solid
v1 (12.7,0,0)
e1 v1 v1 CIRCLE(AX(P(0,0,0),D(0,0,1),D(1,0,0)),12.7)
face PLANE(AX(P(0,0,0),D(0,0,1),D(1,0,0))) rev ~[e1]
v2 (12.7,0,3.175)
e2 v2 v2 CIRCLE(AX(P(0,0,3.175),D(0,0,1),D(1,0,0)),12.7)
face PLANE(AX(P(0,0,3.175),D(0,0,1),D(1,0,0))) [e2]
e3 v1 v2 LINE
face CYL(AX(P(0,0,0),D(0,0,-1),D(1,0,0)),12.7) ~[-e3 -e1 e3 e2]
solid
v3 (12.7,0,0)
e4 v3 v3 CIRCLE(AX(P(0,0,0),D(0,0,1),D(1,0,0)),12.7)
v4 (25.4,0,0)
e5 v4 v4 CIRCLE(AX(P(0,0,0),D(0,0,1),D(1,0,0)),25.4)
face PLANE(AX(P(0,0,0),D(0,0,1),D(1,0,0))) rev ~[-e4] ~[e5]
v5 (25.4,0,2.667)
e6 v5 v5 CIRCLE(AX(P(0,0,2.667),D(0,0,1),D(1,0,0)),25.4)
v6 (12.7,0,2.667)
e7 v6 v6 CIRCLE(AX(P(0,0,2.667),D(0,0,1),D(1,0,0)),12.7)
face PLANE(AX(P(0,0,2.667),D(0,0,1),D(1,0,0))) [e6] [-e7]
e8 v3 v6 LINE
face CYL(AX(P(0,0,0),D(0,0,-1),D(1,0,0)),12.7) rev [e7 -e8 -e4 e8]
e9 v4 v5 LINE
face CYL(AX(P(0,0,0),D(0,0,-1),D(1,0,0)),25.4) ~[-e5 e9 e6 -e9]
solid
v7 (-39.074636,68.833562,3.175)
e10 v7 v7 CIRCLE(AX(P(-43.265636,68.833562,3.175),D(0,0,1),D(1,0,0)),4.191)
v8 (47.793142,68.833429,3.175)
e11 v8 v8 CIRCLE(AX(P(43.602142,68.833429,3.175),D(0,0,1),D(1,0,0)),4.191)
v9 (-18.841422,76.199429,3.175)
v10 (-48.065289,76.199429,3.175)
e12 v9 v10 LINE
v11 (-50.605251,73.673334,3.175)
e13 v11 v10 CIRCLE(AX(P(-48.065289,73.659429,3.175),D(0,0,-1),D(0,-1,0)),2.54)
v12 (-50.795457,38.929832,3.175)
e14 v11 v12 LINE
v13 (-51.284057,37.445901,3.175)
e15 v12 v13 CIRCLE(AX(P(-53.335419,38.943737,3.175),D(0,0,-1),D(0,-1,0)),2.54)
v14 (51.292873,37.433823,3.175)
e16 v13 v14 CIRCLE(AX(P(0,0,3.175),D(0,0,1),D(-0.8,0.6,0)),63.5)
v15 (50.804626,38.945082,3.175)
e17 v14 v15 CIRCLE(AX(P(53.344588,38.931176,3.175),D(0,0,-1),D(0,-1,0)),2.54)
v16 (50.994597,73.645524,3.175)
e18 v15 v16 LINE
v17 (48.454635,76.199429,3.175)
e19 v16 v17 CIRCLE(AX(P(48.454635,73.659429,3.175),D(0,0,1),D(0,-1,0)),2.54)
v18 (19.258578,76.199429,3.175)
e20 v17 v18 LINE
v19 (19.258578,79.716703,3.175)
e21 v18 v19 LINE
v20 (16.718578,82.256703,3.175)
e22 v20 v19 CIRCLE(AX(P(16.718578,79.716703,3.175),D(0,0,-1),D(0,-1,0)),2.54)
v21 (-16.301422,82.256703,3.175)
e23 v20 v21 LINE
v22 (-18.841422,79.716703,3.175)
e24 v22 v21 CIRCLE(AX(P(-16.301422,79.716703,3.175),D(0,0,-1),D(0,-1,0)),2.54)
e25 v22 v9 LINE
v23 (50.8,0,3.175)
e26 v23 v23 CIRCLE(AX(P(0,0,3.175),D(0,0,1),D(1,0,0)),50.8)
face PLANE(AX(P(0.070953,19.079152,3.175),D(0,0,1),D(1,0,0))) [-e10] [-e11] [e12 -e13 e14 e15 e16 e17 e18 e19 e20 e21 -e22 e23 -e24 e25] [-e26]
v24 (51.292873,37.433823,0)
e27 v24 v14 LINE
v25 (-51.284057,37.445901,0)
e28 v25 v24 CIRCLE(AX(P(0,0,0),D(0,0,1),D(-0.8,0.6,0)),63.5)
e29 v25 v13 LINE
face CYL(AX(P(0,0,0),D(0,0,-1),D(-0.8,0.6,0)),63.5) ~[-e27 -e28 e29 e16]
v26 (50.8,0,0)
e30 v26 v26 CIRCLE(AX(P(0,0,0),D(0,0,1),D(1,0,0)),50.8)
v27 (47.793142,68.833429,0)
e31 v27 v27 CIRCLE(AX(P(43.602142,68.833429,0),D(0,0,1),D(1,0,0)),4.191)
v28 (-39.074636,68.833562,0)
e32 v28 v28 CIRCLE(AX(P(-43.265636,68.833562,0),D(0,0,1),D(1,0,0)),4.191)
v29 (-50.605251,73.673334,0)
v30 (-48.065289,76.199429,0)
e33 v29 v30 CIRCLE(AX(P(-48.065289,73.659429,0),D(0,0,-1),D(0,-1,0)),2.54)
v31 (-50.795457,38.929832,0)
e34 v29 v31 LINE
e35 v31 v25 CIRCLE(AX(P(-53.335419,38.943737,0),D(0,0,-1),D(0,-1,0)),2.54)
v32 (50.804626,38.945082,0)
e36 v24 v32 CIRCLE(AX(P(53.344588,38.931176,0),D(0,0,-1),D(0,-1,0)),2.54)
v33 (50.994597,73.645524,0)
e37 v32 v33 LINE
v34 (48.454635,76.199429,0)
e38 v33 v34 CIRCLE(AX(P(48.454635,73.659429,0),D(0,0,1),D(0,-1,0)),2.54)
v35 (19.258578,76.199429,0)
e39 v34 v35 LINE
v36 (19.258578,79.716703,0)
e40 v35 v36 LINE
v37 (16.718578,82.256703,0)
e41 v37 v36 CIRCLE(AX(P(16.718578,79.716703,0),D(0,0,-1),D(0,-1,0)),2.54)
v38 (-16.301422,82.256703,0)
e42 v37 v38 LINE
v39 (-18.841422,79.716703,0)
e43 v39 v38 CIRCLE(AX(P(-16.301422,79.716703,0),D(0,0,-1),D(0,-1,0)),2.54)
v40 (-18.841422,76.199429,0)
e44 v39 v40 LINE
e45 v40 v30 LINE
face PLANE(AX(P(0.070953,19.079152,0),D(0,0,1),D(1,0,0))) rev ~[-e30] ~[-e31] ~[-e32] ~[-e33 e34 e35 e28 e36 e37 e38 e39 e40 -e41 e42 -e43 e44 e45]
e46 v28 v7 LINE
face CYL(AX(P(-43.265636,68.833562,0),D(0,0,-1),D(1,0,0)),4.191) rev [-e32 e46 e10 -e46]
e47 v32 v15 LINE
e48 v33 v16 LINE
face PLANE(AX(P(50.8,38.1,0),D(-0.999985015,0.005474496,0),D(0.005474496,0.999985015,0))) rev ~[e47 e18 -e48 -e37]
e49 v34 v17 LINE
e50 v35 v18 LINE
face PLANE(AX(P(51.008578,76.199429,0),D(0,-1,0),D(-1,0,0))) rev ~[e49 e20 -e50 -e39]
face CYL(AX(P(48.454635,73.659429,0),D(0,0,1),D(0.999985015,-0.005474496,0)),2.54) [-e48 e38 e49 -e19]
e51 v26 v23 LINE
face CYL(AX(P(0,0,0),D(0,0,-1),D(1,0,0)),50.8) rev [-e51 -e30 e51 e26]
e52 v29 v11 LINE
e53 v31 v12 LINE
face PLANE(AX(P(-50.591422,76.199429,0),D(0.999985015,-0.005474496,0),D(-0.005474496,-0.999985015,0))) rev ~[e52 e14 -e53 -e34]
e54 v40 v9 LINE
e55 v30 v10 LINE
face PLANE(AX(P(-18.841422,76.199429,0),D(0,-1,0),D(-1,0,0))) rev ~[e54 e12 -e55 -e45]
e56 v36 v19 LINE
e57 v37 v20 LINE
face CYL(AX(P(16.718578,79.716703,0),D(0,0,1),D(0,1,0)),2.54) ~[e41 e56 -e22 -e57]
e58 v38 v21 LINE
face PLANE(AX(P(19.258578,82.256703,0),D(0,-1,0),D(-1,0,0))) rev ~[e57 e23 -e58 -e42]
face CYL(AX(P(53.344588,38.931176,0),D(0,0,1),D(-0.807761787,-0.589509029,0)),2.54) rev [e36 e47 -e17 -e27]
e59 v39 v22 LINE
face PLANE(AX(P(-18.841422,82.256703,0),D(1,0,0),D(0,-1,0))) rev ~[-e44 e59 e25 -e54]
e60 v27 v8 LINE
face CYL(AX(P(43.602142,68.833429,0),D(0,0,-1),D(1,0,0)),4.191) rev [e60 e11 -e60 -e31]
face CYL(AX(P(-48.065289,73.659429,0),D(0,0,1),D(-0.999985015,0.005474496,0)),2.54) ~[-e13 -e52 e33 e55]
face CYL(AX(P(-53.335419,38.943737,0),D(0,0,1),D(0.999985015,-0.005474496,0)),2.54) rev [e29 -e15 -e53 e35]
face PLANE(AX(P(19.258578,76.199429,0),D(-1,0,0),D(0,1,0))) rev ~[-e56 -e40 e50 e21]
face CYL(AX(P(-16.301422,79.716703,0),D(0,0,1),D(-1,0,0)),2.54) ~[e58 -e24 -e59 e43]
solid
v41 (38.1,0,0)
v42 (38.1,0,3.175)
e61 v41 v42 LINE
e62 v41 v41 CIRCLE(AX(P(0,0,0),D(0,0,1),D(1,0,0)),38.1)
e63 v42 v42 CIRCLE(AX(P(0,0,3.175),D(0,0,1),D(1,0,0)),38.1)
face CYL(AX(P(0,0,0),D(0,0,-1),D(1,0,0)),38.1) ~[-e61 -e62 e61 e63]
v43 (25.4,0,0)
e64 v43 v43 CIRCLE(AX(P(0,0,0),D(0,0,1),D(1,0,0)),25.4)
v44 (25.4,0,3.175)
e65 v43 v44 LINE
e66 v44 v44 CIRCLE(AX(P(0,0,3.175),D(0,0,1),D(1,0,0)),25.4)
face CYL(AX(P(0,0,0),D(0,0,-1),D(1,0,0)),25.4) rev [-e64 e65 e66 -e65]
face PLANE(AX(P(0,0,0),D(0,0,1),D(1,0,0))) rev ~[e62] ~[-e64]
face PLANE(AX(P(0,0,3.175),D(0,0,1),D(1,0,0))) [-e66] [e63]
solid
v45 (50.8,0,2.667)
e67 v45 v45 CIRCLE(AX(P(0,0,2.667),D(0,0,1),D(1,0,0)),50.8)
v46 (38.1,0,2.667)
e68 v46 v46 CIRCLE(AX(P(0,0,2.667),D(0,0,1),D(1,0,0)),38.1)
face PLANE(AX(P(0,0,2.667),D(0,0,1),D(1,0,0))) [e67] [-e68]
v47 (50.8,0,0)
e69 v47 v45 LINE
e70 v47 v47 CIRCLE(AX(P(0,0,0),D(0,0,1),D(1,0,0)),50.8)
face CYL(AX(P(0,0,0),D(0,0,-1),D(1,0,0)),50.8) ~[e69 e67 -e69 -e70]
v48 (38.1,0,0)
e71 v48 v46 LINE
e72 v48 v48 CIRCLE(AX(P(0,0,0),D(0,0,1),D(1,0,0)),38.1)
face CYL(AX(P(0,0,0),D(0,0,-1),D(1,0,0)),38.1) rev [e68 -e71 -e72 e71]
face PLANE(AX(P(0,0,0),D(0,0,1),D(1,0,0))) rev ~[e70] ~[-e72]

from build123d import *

# Parameters (mm, degrees)
F0_R     = 38.1
F0_R_2   = 25.4
F1_DEPTH = 3.175
F0_R_3   = 12.7
F0_R_4   = 50.8
F0_R_5   = 4.191
F2_DEPTH = 2.667
F3_R     = 2.54


# Not quite as in the source:
# - a feature names something its author has since deleted; it is built from what else it names


with BuildPart() as f1:
    # F0 (on Top) → F1 (new body)
    with BuildSketch(Plane.XY):
        Circle(F0_R)
        Circle(F0_R_2, mode=Mode.SUBTRACT)
    extrude(amount=F1_DEPTH)


with BuildPart() as f1b:
    # F0 (on Top) → F1, piece 2 (new body)
    with BuildSketch(Plane.XY):
        Circle(F0_R_3)
    extrude(amount=F1_DEPTH)


with BuildPart() as f1c:
    # F0 (on Top) → F1, piece 3 (new body)
    with BuildSketch(Plane.XY):
        with BuildLine():
            Line((-50.5914217212, 76.1994290653), (-50.8, 38.1))
            ThreePointArc((-50.8, 38.1), (0, -63.5), (50.8, 38.1))
            Line((50.8, 38.1), (51.0085782789, 76.1994290653))
            Line((51.0085782789, 76.1994290653), (19.2585782788, 76.1994290653))
            Line((19.2585782788, 76.1994290653), (19.2585782788, 82.256702956))
            Line((19.2585782788, 82.256702956), (-18.8414217212, 82.256702956))
            Line((-18.8414217212, 82.256702956), (-18.8414217212, 76.1994290653))
            Line((-18.8414217212, 76.1994290653), (-50.5914217211, 76.1994290653))
        make_face()
        Circle(F0_R_4, mode=Mode.SUBTRACT)
        with Locations((-43.265636348, 68.8335622319)):
            Circle(F0_R_5, mode=Mode.SUBTRACT)
        with Locations((43.6021421583, 68.8334290653)):
            Circle(F0_R_5, mode=Mode.SUBTRACT)
    extrude(amount=F1_DEPTH)

    # F3
    f3_edges = [f1c.edges().sort_by_distance(p)[0] for p in [
        (-18.841422, 82.256703, 1.5875),
        (19.258578, 82.256703, 1.5875),
        (-50.591422, 76.199429, 1.5875),
        (51.008578, 76.199429, 1.5875),
        (-50.8, 38.1, 1.5875),
        (50.8, 38.1, 1.5875),
    ]]
    fillet(f3_edges, radius=F3_R)


with BuildPart() as f2:
    # F0 (on Top) → F2 (new body)
    with BuildSketch(Plane.XY):
        Circle(F0_R_4)
        Circle(F0_R, mode=Mode.SUBTRACT)
    extrude(amount=F2_DEPTH)


with BuildPart() as f2b:
    # F0 (on Top) → F2, piece 2 (new body)
    with BuildSketch(Plane.XY):
        Circle(F0_R_2)
        Circle(F0_R_3, mode=Mode.SUBTRACT)
    extrude(amount=F2_DEPTH)


solid = Compound([f1.part, f1b.part, f1c.part, f2.part, f2b.part])
